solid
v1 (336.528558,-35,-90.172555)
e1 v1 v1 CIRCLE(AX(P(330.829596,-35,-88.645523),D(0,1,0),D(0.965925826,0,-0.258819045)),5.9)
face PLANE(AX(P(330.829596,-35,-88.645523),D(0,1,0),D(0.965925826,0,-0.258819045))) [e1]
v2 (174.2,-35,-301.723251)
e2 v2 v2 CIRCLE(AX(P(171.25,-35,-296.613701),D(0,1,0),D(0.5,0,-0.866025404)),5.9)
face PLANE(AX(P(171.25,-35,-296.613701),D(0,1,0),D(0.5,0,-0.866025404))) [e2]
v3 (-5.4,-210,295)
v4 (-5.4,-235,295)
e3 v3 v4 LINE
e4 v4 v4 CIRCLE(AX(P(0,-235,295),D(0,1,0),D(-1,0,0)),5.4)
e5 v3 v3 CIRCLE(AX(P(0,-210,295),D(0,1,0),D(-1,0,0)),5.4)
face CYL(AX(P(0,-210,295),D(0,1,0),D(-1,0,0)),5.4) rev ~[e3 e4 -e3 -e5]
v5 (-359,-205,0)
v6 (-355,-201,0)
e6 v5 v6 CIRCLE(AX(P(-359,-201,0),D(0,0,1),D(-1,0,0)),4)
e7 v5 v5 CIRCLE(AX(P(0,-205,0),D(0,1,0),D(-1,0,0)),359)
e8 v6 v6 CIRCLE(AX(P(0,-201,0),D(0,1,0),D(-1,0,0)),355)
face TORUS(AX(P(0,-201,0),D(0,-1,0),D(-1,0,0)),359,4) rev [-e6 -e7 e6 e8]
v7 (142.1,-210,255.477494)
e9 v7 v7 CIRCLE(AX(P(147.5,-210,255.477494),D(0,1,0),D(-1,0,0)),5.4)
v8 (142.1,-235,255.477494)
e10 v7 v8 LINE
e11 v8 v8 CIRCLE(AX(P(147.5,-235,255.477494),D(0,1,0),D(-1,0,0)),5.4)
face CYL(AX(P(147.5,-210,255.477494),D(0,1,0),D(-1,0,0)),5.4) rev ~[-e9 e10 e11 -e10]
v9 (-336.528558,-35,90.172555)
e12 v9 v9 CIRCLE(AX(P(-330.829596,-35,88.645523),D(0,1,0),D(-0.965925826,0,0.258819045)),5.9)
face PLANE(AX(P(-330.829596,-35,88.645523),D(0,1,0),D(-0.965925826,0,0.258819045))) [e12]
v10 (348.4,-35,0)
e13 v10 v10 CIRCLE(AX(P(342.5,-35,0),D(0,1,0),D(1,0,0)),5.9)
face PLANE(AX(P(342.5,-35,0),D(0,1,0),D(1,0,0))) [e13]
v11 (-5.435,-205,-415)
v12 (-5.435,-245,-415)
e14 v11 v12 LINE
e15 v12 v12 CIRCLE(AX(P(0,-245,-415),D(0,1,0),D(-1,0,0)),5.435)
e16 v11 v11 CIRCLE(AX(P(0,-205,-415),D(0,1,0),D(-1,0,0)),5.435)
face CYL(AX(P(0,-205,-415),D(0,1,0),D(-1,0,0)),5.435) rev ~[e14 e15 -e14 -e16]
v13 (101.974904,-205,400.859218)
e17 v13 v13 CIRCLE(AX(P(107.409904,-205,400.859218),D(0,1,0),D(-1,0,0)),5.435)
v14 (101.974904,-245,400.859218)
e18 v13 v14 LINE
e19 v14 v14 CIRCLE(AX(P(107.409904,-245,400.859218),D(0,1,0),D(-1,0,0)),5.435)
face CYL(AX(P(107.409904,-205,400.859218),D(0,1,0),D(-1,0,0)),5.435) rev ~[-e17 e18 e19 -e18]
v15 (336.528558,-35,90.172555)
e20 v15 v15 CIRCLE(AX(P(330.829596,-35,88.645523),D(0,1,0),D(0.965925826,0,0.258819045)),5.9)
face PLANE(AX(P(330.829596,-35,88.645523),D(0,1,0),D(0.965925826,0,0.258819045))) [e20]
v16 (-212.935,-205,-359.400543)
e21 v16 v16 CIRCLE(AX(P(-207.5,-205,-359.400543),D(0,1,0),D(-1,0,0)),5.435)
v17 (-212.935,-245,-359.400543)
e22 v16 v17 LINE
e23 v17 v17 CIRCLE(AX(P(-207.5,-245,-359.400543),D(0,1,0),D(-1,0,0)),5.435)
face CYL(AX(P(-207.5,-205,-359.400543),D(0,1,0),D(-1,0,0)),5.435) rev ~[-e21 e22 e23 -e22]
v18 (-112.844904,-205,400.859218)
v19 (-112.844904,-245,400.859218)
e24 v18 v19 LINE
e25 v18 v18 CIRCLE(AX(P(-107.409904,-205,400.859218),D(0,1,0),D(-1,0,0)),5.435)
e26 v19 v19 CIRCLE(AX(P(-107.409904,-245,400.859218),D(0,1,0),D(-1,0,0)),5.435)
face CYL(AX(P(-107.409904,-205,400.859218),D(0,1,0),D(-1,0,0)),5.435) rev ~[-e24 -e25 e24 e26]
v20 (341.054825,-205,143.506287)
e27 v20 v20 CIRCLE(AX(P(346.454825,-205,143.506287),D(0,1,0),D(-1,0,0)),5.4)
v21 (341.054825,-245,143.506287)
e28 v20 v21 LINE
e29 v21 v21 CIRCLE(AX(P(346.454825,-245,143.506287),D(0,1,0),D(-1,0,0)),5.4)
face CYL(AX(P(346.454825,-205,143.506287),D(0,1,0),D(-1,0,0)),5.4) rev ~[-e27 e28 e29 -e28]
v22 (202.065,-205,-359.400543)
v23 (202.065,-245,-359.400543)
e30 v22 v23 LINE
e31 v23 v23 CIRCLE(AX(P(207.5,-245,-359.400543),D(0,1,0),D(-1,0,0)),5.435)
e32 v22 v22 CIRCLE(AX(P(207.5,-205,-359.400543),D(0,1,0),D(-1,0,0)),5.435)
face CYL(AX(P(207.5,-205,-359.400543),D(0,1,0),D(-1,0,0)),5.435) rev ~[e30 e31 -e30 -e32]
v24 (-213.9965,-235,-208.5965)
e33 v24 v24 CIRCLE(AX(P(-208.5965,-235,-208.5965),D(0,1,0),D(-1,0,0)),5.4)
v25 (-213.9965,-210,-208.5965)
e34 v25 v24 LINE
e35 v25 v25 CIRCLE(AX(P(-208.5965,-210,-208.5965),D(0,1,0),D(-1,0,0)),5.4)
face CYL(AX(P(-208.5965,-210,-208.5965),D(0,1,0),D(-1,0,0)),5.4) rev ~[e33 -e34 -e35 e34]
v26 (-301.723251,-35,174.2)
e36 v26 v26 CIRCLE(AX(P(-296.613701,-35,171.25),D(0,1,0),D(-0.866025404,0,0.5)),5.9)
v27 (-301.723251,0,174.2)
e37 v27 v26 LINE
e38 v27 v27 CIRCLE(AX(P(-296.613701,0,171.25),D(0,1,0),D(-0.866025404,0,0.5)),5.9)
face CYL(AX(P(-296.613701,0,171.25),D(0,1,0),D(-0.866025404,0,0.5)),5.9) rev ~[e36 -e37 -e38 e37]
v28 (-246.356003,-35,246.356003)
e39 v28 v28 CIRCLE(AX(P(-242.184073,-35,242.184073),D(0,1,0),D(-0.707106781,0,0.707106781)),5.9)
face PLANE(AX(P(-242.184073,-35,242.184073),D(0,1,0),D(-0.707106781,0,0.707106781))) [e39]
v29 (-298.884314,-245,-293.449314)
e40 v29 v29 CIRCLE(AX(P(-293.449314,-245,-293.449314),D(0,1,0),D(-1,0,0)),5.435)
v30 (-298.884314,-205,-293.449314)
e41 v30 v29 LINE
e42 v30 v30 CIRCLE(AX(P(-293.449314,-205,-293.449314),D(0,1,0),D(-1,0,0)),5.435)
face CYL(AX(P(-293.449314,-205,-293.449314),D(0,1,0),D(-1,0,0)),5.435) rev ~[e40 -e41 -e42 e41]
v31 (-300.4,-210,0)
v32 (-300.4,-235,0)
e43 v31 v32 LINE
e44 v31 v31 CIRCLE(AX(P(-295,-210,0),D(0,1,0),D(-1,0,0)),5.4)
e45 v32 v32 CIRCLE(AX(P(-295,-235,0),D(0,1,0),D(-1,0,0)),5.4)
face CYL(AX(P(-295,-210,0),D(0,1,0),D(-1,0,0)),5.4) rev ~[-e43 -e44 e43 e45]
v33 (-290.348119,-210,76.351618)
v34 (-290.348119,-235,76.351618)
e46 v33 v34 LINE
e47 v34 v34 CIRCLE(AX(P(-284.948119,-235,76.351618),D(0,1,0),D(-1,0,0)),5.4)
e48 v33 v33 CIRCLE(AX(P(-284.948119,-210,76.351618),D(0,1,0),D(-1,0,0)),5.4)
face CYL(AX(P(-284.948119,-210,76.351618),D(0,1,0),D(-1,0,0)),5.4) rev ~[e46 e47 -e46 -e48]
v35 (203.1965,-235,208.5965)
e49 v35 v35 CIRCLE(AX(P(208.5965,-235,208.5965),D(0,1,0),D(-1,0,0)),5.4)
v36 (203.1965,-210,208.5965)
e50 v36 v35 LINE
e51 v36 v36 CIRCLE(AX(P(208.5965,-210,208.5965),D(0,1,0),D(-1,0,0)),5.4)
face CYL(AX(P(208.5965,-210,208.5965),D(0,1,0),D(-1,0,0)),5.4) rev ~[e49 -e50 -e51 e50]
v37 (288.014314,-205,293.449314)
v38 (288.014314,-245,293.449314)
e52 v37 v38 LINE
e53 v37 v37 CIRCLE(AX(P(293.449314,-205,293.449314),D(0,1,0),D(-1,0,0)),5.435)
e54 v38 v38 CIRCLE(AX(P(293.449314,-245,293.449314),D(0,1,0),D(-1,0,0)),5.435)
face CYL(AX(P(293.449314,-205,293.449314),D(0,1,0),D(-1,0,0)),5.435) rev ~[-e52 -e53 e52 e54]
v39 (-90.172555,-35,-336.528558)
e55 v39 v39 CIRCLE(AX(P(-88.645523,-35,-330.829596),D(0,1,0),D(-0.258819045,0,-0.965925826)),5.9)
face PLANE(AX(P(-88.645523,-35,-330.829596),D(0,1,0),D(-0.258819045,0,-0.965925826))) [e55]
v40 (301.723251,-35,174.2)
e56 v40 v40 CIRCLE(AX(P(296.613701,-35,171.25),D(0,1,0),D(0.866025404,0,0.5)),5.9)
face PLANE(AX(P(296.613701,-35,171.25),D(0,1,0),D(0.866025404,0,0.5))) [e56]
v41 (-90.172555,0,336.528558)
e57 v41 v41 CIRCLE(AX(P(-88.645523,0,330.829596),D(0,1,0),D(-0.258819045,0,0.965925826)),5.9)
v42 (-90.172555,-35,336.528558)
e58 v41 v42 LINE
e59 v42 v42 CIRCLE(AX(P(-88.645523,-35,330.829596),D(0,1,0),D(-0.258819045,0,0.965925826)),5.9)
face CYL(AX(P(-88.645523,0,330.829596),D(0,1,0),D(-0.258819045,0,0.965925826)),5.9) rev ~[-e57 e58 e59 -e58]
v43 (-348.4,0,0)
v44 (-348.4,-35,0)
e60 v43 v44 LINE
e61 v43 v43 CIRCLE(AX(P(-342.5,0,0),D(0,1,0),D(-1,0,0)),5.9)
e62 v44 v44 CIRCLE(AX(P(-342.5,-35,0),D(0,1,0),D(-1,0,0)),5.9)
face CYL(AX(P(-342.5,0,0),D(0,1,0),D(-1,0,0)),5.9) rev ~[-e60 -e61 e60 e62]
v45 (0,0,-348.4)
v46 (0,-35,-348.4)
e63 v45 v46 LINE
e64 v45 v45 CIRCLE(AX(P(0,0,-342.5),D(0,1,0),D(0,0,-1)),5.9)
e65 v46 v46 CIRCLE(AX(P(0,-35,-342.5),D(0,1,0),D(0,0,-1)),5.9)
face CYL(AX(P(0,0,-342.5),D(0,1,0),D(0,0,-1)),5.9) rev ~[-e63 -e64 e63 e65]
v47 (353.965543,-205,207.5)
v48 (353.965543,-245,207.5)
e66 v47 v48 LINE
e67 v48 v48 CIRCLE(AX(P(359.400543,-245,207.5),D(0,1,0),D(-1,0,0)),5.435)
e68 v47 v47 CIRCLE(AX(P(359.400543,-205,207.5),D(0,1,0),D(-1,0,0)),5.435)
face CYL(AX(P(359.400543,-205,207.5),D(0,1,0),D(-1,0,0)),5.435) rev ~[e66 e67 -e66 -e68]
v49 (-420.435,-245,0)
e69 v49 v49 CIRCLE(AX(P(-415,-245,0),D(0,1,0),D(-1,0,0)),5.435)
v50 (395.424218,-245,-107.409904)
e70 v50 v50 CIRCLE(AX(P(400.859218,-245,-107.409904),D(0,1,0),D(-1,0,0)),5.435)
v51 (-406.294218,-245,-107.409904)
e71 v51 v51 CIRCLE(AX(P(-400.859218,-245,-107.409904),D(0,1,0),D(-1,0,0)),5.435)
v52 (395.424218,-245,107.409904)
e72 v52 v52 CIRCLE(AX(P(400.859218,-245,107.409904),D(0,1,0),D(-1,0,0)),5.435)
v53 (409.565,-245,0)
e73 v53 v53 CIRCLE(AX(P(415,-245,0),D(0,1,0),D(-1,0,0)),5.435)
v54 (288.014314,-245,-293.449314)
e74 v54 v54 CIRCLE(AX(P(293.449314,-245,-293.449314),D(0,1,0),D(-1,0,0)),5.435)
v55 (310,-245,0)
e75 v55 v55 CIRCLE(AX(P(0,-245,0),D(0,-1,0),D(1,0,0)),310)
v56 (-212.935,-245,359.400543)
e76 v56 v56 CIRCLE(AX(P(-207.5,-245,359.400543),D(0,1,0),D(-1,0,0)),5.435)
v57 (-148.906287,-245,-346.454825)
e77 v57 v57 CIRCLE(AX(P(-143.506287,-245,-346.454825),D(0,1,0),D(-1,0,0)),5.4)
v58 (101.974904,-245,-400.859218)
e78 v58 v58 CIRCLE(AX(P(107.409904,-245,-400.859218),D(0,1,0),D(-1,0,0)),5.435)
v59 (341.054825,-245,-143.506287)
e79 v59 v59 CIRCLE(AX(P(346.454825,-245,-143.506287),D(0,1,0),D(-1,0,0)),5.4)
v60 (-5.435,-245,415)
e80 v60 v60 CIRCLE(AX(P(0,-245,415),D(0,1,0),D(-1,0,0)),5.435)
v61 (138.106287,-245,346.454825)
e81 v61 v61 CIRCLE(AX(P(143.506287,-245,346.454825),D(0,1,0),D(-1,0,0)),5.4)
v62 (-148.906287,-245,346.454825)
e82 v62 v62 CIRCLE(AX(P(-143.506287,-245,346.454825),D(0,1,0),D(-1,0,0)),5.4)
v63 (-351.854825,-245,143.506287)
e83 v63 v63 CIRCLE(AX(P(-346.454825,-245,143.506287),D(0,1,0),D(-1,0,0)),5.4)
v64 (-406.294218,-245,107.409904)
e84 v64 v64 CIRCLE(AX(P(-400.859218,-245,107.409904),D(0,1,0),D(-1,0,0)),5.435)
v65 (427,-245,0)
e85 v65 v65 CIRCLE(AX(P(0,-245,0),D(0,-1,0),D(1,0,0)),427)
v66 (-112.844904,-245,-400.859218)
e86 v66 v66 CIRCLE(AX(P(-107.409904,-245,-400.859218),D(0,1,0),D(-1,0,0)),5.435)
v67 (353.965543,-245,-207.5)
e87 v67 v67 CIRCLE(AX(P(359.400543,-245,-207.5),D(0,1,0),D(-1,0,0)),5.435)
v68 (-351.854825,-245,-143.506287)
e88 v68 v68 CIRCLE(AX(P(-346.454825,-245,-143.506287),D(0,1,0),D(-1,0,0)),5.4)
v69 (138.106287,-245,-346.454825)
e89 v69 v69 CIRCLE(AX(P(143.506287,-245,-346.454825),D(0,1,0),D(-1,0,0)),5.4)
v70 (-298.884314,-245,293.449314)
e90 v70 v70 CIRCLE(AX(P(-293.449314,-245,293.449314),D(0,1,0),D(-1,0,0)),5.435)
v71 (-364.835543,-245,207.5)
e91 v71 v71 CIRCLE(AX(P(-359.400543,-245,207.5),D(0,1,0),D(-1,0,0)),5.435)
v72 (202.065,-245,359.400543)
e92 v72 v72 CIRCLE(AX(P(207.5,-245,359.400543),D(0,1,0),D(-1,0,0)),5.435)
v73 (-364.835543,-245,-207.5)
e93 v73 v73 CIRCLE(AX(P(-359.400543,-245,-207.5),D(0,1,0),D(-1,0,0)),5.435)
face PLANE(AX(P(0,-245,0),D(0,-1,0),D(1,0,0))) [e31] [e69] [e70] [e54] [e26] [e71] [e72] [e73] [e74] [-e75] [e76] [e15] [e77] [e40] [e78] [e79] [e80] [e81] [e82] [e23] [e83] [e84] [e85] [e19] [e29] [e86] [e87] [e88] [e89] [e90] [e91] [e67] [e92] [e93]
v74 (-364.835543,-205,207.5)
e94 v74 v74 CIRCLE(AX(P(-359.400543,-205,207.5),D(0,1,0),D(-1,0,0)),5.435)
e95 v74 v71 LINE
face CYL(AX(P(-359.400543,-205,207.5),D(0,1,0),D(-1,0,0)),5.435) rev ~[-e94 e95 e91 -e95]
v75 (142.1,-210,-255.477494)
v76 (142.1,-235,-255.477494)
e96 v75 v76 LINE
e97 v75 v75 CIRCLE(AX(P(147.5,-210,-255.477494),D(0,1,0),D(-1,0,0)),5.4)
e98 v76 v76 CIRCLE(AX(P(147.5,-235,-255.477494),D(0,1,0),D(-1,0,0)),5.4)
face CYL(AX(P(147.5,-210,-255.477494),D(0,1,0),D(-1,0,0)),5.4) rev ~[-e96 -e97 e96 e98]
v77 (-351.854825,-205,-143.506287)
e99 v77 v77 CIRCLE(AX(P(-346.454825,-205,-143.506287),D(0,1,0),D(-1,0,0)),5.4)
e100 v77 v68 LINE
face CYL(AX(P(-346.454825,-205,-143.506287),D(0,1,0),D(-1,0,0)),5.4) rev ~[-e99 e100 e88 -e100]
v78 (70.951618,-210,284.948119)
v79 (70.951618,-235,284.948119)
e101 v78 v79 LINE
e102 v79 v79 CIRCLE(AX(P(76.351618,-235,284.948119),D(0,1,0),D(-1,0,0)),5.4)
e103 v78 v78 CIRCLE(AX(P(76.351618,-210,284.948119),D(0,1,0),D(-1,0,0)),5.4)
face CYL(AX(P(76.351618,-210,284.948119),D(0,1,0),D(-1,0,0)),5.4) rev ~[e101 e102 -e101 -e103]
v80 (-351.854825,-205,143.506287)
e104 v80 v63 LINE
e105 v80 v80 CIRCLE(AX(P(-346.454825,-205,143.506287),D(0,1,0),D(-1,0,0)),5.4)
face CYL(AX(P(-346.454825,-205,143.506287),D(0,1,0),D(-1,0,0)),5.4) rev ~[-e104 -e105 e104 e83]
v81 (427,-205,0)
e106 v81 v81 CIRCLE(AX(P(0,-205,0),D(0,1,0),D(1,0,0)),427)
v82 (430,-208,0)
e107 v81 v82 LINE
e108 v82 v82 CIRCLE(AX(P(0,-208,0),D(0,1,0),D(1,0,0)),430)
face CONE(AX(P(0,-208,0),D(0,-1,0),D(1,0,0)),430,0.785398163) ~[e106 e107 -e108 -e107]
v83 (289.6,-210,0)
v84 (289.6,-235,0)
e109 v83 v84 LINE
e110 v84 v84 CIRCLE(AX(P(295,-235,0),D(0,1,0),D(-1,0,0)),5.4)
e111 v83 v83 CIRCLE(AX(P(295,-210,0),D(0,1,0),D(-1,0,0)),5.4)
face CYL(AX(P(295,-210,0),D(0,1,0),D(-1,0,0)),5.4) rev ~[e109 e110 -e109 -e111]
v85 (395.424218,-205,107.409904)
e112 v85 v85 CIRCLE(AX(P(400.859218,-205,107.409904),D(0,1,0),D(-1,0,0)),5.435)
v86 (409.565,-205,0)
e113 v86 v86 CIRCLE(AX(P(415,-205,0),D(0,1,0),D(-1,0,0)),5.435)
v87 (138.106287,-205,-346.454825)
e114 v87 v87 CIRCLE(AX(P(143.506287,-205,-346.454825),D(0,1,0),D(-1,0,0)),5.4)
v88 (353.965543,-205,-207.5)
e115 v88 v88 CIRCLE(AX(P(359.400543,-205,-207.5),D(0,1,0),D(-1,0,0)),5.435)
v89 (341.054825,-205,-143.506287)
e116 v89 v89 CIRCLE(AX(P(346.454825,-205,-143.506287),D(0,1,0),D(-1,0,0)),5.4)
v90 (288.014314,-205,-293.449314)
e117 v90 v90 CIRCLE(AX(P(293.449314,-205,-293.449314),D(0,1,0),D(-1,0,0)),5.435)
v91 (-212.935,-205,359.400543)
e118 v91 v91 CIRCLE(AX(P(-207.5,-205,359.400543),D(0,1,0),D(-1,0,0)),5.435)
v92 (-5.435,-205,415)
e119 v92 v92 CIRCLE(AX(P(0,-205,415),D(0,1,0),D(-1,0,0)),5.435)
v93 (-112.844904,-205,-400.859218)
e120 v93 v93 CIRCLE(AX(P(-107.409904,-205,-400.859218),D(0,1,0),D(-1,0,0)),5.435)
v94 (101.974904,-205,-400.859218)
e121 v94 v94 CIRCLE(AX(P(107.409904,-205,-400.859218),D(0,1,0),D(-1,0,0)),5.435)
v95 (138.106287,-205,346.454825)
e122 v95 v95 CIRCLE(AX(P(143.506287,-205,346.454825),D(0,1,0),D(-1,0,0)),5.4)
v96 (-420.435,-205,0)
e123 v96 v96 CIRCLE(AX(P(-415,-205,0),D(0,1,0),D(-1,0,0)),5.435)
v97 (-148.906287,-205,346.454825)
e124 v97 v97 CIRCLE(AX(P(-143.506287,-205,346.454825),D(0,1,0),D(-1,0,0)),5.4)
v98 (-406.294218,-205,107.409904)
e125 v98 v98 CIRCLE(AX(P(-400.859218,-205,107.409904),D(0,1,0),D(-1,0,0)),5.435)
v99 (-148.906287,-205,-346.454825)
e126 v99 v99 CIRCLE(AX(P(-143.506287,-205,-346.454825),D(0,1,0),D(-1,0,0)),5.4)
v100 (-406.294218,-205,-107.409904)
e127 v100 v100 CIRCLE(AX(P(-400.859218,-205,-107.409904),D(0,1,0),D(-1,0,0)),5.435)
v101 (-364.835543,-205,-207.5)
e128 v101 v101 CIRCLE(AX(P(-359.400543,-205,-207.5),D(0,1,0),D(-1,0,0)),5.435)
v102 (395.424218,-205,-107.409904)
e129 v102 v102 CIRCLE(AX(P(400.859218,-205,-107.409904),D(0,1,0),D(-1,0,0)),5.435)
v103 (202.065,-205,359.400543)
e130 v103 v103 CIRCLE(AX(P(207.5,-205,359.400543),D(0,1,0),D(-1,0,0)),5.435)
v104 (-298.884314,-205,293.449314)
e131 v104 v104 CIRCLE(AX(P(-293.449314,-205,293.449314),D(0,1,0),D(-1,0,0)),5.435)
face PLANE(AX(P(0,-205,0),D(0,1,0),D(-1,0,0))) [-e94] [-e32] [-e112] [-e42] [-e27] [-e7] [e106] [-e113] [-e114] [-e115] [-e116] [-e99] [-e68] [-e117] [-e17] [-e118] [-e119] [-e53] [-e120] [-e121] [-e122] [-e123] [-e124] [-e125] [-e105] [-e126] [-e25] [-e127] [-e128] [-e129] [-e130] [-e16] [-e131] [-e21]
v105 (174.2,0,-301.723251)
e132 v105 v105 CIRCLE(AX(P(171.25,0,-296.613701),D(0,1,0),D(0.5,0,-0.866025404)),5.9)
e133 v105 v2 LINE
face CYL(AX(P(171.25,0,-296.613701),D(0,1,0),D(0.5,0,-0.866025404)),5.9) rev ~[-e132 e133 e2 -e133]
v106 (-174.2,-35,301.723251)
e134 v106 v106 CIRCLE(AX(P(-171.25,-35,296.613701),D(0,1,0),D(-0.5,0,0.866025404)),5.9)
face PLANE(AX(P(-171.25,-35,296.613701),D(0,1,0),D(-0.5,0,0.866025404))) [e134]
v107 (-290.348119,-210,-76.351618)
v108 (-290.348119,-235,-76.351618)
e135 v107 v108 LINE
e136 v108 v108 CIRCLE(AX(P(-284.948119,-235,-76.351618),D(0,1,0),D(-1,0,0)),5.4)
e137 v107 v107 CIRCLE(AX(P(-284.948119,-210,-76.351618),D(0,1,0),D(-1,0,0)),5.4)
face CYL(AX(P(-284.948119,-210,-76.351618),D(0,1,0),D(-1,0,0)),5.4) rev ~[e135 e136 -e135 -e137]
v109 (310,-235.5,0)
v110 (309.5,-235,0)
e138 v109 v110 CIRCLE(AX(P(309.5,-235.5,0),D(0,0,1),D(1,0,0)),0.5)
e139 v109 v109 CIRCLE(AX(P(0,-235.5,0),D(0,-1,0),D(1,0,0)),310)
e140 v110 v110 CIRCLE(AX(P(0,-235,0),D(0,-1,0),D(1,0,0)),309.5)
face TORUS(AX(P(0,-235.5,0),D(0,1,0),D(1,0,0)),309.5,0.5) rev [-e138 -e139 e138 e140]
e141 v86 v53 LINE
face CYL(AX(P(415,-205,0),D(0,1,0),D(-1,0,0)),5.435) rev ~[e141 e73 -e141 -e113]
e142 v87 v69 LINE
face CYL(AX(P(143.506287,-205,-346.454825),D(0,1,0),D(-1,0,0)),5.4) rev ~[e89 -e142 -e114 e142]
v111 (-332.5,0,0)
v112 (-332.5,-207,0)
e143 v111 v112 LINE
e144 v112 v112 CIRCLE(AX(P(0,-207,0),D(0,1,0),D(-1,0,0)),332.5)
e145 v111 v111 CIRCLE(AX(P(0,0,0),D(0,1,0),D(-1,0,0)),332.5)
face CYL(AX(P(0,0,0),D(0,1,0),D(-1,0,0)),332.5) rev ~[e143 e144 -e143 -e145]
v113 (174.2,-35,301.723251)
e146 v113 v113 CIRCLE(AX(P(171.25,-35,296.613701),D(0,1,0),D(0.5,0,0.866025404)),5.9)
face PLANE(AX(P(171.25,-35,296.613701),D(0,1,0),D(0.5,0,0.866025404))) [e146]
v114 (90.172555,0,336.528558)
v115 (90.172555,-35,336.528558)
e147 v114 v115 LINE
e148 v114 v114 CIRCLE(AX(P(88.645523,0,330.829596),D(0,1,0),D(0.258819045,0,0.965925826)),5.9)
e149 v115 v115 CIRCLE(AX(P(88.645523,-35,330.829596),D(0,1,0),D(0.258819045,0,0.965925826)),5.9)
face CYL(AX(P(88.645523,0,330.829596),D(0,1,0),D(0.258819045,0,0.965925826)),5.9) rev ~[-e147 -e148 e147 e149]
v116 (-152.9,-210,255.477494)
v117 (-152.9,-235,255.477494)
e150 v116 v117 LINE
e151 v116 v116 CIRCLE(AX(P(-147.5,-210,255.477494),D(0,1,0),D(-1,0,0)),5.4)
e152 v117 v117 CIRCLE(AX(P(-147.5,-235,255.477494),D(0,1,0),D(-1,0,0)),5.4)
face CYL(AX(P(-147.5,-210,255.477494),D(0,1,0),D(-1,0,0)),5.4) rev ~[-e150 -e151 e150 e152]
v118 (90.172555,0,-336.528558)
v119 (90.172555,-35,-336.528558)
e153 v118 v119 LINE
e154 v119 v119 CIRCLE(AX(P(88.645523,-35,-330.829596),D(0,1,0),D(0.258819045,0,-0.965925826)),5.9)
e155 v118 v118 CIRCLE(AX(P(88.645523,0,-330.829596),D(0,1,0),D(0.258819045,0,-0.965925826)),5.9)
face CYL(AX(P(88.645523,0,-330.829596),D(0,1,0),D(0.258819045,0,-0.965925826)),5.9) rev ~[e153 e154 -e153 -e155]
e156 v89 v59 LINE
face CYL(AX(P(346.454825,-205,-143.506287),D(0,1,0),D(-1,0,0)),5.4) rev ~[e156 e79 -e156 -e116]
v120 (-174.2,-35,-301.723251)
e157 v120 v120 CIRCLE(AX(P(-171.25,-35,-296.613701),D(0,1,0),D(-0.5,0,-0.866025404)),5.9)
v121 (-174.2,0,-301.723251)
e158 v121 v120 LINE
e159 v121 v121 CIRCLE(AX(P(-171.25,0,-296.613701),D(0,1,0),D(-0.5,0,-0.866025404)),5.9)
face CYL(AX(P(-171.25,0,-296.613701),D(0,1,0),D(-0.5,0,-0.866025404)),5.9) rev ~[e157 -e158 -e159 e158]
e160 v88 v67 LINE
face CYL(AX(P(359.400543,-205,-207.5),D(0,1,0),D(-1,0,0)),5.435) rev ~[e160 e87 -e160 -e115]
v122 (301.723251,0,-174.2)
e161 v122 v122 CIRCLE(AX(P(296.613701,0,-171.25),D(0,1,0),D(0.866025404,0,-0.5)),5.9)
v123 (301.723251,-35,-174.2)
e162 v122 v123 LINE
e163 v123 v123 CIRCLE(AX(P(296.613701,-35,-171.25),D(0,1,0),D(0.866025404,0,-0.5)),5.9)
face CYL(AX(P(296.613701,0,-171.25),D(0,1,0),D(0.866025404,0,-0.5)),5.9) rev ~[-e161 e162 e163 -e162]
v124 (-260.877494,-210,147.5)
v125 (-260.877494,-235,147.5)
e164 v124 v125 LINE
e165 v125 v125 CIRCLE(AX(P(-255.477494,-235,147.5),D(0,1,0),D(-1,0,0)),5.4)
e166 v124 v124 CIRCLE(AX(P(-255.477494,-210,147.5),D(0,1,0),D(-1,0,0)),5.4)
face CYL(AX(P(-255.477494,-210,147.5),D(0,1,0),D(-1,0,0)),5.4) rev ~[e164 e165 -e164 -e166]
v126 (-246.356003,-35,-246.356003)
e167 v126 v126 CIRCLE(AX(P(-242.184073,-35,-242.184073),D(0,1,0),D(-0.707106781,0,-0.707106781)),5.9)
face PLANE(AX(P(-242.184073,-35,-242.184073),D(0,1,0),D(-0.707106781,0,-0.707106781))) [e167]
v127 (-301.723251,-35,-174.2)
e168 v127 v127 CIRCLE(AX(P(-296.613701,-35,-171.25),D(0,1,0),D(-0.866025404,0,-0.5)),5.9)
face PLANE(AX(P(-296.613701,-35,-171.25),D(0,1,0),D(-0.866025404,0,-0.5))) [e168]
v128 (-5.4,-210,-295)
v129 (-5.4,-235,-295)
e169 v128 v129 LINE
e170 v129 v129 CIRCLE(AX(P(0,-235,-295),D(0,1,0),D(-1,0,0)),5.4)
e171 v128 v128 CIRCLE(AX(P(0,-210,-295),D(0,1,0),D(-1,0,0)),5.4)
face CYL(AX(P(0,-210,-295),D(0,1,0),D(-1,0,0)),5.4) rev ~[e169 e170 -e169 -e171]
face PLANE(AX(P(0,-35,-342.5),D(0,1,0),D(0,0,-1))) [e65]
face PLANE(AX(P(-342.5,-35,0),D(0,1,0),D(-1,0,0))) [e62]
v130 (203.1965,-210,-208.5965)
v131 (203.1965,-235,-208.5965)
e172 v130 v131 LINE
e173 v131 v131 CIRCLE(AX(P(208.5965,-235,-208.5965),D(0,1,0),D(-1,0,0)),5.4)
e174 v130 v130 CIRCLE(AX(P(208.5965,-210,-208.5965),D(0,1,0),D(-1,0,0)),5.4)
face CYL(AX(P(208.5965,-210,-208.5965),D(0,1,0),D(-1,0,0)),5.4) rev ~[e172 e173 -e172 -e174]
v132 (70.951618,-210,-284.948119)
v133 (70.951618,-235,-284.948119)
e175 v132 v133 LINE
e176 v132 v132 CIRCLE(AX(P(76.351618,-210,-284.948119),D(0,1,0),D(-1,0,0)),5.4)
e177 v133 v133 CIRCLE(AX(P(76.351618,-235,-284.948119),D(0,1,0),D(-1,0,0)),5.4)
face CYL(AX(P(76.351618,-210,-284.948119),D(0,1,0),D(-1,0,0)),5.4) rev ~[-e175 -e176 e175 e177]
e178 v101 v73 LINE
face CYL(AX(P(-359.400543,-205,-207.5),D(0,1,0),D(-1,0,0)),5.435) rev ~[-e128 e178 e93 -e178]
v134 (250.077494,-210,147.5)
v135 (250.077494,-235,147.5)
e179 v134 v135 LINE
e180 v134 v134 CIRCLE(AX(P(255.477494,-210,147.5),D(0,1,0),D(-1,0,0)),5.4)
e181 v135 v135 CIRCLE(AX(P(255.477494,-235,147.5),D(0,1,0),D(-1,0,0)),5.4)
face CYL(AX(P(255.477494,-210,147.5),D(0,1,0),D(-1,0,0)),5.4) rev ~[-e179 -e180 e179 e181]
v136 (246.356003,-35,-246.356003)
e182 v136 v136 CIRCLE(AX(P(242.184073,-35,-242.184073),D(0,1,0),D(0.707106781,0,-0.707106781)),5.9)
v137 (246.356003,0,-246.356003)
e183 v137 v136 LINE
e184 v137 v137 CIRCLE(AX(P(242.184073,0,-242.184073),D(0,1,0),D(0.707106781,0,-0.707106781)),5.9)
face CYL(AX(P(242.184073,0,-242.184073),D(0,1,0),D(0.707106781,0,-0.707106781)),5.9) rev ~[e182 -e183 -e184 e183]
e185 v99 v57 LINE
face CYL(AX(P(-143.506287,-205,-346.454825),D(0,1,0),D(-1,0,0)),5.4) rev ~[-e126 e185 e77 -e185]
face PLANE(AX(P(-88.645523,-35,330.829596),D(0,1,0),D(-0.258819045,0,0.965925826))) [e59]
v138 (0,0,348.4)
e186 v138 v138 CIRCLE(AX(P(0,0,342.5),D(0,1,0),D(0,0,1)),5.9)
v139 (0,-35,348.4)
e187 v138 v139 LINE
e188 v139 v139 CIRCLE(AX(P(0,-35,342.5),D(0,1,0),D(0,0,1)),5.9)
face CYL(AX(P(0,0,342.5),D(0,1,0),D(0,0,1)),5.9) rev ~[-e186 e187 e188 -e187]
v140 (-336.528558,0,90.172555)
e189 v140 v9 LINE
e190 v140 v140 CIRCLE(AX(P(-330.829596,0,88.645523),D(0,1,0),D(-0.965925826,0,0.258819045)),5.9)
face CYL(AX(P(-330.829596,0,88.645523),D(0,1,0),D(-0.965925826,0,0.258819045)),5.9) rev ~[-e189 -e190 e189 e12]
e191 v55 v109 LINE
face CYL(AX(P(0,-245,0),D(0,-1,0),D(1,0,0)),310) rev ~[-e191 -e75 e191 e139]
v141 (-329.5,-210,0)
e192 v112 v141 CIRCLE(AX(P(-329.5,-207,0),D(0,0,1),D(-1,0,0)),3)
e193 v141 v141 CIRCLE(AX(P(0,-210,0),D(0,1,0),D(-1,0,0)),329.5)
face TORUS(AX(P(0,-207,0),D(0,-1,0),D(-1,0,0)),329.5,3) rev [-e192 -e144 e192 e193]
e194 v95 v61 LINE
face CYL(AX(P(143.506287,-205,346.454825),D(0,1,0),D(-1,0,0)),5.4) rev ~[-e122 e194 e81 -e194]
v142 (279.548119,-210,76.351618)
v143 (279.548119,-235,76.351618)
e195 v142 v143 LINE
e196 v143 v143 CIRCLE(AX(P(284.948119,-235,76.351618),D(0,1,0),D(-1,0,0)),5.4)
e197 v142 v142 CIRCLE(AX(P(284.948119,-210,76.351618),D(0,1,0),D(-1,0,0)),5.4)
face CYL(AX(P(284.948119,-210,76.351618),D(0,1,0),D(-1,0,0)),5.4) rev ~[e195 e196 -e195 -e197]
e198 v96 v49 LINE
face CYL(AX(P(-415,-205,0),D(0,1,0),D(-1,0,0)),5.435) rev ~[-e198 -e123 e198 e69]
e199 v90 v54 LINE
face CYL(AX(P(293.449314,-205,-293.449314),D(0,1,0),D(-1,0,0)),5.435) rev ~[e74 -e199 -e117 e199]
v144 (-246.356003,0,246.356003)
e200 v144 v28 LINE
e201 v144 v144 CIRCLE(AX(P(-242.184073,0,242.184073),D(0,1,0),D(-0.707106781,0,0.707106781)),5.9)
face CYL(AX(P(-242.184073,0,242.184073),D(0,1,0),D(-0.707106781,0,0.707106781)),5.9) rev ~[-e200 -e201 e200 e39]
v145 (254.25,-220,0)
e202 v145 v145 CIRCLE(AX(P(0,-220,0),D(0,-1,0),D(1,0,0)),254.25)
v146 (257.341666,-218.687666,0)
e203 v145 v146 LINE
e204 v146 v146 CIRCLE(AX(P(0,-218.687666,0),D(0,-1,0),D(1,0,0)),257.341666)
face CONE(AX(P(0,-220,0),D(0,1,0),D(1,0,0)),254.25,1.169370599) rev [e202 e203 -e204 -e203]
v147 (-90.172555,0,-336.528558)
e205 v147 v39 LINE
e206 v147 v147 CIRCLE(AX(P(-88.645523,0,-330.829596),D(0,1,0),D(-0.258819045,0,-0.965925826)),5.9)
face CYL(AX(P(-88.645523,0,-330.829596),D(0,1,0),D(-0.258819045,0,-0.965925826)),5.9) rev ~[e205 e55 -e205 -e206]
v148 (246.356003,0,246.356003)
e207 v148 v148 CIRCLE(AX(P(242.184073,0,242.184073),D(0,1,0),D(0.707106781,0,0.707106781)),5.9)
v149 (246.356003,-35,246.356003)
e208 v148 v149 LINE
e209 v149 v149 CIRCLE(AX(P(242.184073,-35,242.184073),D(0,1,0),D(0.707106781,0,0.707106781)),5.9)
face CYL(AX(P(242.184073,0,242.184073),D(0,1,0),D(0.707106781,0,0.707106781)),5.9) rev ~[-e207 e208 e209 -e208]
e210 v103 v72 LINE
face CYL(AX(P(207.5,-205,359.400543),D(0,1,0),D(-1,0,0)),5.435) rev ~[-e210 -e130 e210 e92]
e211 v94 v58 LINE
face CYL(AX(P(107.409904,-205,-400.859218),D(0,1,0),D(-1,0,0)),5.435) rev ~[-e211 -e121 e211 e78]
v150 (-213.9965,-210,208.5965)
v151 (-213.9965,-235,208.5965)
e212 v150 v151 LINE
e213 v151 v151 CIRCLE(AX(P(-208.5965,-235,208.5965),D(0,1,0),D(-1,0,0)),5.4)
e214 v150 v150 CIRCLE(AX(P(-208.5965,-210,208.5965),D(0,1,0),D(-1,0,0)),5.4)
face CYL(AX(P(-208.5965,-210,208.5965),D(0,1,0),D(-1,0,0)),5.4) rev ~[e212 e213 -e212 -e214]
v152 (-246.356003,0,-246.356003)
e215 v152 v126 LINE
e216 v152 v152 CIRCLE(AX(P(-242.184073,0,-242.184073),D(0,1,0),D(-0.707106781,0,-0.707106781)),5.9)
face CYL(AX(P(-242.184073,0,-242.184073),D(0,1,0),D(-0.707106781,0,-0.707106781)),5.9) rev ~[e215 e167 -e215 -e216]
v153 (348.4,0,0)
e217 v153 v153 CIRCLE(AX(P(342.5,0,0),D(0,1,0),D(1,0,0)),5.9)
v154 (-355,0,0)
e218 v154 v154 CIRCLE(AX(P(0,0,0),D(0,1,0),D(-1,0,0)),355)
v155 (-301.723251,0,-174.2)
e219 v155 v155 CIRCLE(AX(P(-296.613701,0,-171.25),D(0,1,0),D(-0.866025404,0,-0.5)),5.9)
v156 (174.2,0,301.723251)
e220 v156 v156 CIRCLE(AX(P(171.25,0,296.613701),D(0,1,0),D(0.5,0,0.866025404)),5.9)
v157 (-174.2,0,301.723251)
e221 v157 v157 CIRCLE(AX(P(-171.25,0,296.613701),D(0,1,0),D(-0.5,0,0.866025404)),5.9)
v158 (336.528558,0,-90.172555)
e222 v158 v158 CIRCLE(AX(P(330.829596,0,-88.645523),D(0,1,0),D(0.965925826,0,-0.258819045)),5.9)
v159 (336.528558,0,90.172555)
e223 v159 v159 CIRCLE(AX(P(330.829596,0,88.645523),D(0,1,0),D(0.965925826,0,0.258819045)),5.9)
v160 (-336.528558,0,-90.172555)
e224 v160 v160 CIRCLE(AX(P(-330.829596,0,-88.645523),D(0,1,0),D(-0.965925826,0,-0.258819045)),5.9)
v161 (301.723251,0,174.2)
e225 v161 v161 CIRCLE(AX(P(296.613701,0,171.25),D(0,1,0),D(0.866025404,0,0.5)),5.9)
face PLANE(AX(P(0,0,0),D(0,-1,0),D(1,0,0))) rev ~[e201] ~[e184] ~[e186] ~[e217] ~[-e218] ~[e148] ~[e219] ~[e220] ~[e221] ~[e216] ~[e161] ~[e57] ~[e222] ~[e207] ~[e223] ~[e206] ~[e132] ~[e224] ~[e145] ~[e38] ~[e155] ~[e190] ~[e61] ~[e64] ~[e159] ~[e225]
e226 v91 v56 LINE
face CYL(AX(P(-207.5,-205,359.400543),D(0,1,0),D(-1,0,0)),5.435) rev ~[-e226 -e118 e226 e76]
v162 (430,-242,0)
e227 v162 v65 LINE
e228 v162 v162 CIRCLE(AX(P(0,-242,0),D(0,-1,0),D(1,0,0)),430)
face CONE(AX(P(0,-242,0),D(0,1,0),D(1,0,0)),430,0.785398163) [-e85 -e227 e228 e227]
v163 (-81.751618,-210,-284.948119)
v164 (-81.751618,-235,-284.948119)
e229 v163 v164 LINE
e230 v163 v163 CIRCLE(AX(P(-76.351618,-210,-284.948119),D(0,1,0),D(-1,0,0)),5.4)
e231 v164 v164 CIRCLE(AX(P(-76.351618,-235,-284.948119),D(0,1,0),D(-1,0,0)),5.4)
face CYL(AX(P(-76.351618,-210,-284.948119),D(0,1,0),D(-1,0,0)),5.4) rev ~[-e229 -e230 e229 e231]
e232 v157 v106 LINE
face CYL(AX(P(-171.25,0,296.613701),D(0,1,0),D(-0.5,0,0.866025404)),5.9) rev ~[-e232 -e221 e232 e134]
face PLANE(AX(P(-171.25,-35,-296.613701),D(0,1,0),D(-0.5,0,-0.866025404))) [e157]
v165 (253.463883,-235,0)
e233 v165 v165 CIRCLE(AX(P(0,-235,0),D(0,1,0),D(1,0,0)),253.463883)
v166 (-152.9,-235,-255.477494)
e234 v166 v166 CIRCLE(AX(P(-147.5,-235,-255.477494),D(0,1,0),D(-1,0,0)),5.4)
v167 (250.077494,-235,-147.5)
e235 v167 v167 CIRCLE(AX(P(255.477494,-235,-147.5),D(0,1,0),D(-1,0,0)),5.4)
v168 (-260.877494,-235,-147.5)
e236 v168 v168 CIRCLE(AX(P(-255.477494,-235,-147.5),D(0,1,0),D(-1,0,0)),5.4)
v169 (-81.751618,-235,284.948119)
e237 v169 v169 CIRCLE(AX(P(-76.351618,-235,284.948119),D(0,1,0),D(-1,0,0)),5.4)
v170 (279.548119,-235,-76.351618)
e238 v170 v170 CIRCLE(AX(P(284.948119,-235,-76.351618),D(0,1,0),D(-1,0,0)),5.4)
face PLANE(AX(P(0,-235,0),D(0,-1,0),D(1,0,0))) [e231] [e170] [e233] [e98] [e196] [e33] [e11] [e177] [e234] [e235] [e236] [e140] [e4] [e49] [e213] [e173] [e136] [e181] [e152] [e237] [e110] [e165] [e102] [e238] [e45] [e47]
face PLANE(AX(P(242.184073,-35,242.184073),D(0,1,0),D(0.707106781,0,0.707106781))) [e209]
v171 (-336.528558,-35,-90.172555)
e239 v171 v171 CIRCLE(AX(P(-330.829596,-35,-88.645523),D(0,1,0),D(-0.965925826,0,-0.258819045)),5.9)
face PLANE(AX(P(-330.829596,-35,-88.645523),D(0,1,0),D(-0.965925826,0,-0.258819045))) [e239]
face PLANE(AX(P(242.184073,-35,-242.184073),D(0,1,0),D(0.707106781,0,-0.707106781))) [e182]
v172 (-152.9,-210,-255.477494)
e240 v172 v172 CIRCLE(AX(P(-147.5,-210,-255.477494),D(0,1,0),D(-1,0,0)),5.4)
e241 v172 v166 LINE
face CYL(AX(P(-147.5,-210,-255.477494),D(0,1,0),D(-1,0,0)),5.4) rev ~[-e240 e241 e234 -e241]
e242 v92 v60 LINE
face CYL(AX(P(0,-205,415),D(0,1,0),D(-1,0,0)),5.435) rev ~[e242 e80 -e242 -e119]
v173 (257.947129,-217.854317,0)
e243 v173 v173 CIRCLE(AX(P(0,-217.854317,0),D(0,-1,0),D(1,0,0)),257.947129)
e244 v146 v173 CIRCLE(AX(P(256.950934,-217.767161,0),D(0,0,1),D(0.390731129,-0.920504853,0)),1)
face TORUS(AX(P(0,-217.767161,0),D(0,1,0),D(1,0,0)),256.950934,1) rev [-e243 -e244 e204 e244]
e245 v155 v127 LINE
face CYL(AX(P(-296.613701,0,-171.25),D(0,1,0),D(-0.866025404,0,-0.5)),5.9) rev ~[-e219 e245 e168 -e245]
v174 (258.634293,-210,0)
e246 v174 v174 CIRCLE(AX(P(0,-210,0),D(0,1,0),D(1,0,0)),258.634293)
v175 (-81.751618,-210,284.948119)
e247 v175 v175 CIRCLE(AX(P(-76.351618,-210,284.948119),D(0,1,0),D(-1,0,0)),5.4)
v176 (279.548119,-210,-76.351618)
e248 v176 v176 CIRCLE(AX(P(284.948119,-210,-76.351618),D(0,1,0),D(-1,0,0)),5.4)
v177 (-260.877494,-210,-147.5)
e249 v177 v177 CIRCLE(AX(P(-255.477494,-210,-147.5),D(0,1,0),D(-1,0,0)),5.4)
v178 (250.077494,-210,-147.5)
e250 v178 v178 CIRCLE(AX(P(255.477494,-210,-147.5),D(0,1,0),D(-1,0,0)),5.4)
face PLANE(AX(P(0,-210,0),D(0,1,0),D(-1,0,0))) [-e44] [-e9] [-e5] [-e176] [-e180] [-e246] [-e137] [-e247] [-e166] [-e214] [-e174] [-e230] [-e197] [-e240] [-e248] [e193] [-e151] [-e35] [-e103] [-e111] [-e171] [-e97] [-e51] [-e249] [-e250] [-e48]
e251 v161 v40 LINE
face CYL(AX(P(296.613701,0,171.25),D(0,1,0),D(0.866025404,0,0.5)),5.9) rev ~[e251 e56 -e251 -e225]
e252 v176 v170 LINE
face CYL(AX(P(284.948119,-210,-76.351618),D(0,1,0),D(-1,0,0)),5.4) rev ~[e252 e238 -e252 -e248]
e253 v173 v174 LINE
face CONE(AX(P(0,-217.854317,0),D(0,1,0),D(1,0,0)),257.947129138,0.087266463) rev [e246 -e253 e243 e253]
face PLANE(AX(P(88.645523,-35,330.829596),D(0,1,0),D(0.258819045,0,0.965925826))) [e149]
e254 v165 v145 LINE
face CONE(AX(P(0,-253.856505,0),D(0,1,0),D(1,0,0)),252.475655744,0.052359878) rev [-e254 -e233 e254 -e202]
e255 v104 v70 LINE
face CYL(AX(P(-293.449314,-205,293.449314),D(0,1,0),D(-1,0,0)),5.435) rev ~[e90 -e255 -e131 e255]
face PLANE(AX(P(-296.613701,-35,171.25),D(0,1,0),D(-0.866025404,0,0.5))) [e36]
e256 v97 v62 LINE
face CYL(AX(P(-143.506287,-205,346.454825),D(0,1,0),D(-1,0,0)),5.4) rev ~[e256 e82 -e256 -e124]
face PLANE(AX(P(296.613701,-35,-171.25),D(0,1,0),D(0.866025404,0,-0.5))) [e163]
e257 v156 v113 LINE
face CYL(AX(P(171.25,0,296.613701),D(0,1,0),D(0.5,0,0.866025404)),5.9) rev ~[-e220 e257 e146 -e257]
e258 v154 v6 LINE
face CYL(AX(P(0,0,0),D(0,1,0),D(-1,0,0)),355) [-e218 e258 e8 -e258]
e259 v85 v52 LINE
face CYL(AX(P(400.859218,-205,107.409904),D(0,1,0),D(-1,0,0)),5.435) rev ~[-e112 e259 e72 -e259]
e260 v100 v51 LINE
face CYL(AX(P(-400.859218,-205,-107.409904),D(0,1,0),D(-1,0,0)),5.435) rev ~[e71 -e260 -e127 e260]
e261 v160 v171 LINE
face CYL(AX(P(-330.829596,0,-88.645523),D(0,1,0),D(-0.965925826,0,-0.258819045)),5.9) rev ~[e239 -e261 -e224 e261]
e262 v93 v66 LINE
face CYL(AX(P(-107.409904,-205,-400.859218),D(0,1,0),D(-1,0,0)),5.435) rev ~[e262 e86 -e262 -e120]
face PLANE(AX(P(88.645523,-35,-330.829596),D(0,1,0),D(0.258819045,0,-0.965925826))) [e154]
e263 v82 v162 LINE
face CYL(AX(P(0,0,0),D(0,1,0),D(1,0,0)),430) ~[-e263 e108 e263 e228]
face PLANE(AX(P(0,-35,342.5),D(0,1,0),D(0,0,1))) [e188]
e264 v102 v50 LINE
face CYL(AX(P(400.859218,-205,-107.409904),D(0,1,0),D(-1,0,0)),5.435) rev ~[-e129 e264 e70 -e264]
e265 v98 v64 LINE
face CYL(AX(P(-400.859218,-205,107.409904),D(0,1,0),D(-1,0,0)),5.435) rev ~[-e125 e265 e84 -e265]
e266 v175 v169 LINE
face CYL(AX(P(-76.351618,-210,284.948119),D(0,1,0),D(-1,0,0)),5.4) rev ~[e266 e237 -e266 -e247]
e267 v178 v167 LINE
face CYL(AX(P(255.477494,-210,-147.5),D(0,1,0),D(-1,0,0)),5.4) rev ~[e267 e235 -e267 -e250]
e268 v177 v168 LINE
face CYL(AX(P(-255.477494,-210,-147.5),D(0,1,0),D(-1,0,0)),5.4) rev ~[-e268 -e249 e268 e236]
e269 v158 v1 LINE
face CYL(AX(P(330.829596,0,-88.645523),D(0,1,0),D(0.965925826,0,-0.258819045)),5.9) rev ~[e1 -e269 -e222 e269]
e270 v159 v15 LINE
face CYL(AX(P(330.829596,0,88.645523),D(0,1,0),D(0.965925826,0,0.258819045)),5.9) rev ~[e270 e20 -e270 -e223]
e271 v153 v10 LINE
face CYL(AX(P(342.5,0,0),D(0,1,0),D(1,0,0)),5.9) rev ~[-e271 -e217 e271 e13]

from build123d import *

# Parameters (mm, degrees)
F0_R             = 430
F0_R_2           = 250
F1_DEPTH         = 245
F2_R             = 514.2941305418
F2_R_2           = 430
F2_R_3           = 355
F3_DEPTH         = 205
F4_R             = 332.5
F4_R_2           = 250
F4_R_3           = 222.4010039599
F5_DEPTH         = 210
F6_R             = 310
F6_R_2           = 214.2151850965
F7_DEPTH         = 10
F10_R            = 5.9
F11_DEPTH        = 35
F11_COPIES_COUNT = 24
F12_R            = 5.435
F13_DEPTH        = 100
F14_R            = 5.4
F15_DEPTH        = 331
F16_R            = 5.4
F17_DEPTH        = 50
F18_R            = 3
F19_SIZE         = 3
F20_R            = 4
F21_R            = 0.5


# Not quite as in the source:
# - a pattern or mirror of a feature is missing from the dataset's text; its kind, count and spacing are read off the source's solid


with BuildPart() as f1:
    # F0 (on Front) → F1 (new body)
    with BuildSketch(Plane.XZ):
        Circle(F0_R)
        Circle(F0_R_2, mode=Mode.SUBTRACT)
    extrude(amount=F1_DEPTH)

    # F2 (on face) → F3 (cut)
    with BuildSketch(Plane(origin=(0, 0, 0), x_dir=(-1, 0, 0), z_dir=(0, 1, 0))):
        Circle(F2_R)
        Circle(F2_R_2, mode=Mode.SUBTRACT)
        Circle(F2_R_2)
        Circle(F2_R_3, mode=Mode.SUBTRACT)
    extrude(amount=-F3_DEPTH, mode=Mode.SUBTRACT)

    # F4 (on face) → F5 (cut)
    with BuildSketch(Plane(origin=(0, 0, 0), x_dir=(-1, 0, 0), z_dir=(0, 1, 0))):
        Circle(F4_R)
        Circle(F4_R_2, mode=Mode.SUBTRACT)
        Circle(F4_R_2)
        Circle(F4_R_3, mode=Mode.SUBTRACT)
    extrude(amount=-F5_DEPTH, mode=Mode.SUBTRACT)

    # F6 (on face) → F7 (cut)
    with BuildSketch(Plane.XZ.offset(245)):
        Circle(F6_R)
        Circle(F6_R_2, mode=Mode.SUBTRACT)
    extrude(amount=-F7_DEPTH, mode=Mode.SUBTRACT)

    # F8 (on Top) → F9 (revolve, cut)
    with BuildSketch(Plane.XY):
        with BuildLine():
            ThreePointArc((257.3416655686, -218.687665826), (257.7599514345, -218.3549462248), (257.9471291382, -217.8543167153))
            Line((257.9471291382, -217.8543167153), (259.225389771, -203.243730826))
            Line((259.225389771, -203.243730826), (236.3019734621, -203.243730826))
            Line((236.3019734621, -203.243730826), (252.4756557438, -253.856505284))
            Line((252.4756557438, -253.856505284), (254.25, -220))
            Line((254.25, -220), (257.3416655686, -218.687665826))
        make_face()
    revolve(axis=Axis((0, -156.0075889291, 0), (0, -1, 0)), mode=Mode.SUBTRACT)

    # F10 (on face) → F11 (cut)
    with BuildSketch(Plane(origin=(0, 0, 0), x_dir=(-1, 0, 0), z_dir=(0, 1, 0))):
        with Locations((342.5, 0)):
            Circle(F10_R)
    f11 = extrude(amount=-F11_DEPTH, mode=Mode.SUBTRACT)

    # F11_copies: F11 ×24 about axis
    f11_copies_axis = Axis((0, 0, 0), (0, 1, 0))
    for i in range(1, F11_COPIES_COUNT):
        add(f11.rotate(f11_copies_axis, i * 360 / F11_COPIES_COUNT), mode=Mode.SUBTRACT)

    # F12 (on face) → F13 (cut)
    with BuildSketch(Plane(origin=(0, -205, 0), x_dir=(-1, 0, 0), z_dir=(0, 1, 0))):
        with Locations((0, 415)):
            Circle(F12_R)
        with Locations((-107.4099037175, 400.85921791)):
            Circle(F12_R)
        with Locations((-207.5, 359.4005425705)):
            Circle(F12_R)
        with Locations((-293.4493141924, 293.4493141924)):
            Circle(F12_R)
        with Locations((-359.4005425705, 207.5)):
            Circle(F12_R)
        with Locations((-400.85921791, 107.4099037175)):
            Circle(F12_R)
        with Locations((-415, 0)):
            Circle(F12_R)
        with Locations((-400.85921791, -107.4099037175)):
            Circle(F12_R)
        with Locations((-359.4005425705, -207.5)):
            Circle(F12_R)
        with Locations((-293.4493141924, -293.4493141924)):
            Circle(F12_R)
        with Locations((-207.5, -359.4005425705)):
            Circle(F12_R)
        with Locations((-107.4099037175, -400.85921791)):
            Circle(F12_R)
        with Locations((0, -415)):
            Circle(F12_R)
        with Locations((107.4099037175, -400.85921791)):
            Circle(F12_R)
        with Locations((207.5, -359.4005425705)):
            Circle(F12_R)
        with Locations((293.4493141924, -293.4493141924)):
            Circle(F12_R)
        with Locations((359.4005425705, -207.5)):
            Circle(F12_R)
        with Locations((400.85921791, -107.4099037175)):
            Circle(F12_R)
        with Locations((415, 0)):
            Circle(F12_R)
        with Locations((400.85921791, 107.4099037175)):
            Circle(F12_R)
        with Locations((359.4005425705, 207.5)):
            Circle(F12_R)
        with Locations((293.4493141924, 293.4493141924)):
            Circle(F12_R)
        with Locations((207.5, 359.4005425705)):
            Circle(F12_R)
        with Locations((107.4099037175, 400.85921791)):
            Circle(F12_R)
    extrude(amount=-F13_DEPTH, mode=Mode.SUBTRACT)

    # F14 (on face) → F15 (cut)
    with BuildSketch(Plane(origin=(0, -210, 0), x_dir=(-1, 0, 0), z_dir=(0, 1, 0))):
        with Locations((0, 295)):
            Circle(F14_R)
        with Locations((-76.3516183052, 284.9481187553)):
            Circle(F14_R)
        with Locations((-147.5, 255.4774941164)):
            Circle(F14_R)
        with Locations((-208.59650045, 208.59650045)):
            Circle(F14_R)
        with Locations((-255.4774941164, 147.5)):
            Circle(F14_R)
        with Locations((-284.9481187553, 76.3516183052)):
            Circle(F14_R)
        with Locations((-295, 0)):
            Circle(F14_R)
        with Locations((-284.9481187553, -76.3516183052)):
            Circle(F14_R)
        with Locations((-255.4774941164, -147.5)):
            Circle(F14_R)
        with Locations((-208.59650045, -208.59650045)):
            Circle(F14_R)
        with Locations((-147.5, -255.4774941164)):
            Circle(F14_R)
        with Locations((-76.3516183052, -284.9481187553)):
            Circle(F14_R)
        with Locations((0, -295)):
            Circle(F14_R)
        with Locations((76.3516183052, -284.9481187553)):
            Circle(F14_R)
        with Locations((147.5, -255.4774941164)):
            Circle(F14_R)
        with Locations((208.59650045, -208.59650045)):
            Circle(F14_R)
        with Locations((255.4774941164, -147.5)):
            Circle(F14_R)
        with Locations((284.9481187553, -76.3516183052)):
            Circle(F14_R)
        with Locations((295, 0)):
            Circle(F14_R)
        with Locations((284.9481187553, 76.3516183052)):
            Circle(F14_R)
        with Locations((255.4774941164, 147.5)):
            Circle(F14_R)
        with Locations((208.59650045, 208.59650045)):
            Circle(F14_R)
        with Locations((147.5, 255.4774941164)):
            Circle(F14_R)
        with Locations((76.3516183052, 284.9481187553)):
            Circle(F14_R)
    extrude(amount=-F15_DEPTH, mode=Mode.SUBTRACT)

    # F16 (on face) → F17 (cut)
    with BuildSketch(Plane(origin=(0, -205, 0), x_dir=(-1, 0, 0), z_dir=(0, 1, 0))):
        with Locations((-143.5062871369, 346.4548246917)):
            Circle(F16_R)
        with Locations((-346.4548246917, 143.5062871369)):
            Circle(F16_R)
        with Locations((-346.4548246917, -143.5062871369)):
            Circle(F16_R)
        with Locations((-143.5062871369, -346.4548246917)):
            Circle(F16_R)
        with Locations((143.5062871369, -346.4548246917)):
            Circle(F16_R)
        with Locations((346.4548246917, -143.5062871369)):
            Circle(F16_R)
        with Locations((346.4548246917, 143.5062871369)):
            Circle(F16_R)
        with Locations((143.5062871369, 346.4548246917)):
            Circle(F16_R)
    extrude(amount=-F17_DEPTH, mode=Mode.SUBTRACT)

    # F18
    f18_edges = [f1.edges().sort_by_distance(p)[0] for p in [
        (332.5, -210, 0),
    ]]
    fillet(f18_edges, radius=F18_R)

    # F19
    f19_edges = [f1.edges().sort_by_distance(p)[0] for p in [
        (-430, -245, 0),
        (-430, -205, 0),
    ]]
    chamfer(f19_edges, length=F19_SIZE)

    # F20
    f20_edges = [f1.edges().sort_by_distance(p)[0] for p in [
        (355, -205, 0),
    ]]
    fillet(f20_edges, radius=F20_R)

    # F21
    f21_edges = [f1.edges().sort_by_distance(p)[0] for p in [
        (-310, -235, 0),
    ]]
    fillet(f21_edges, radius=F21_R)


solid = f1.part
